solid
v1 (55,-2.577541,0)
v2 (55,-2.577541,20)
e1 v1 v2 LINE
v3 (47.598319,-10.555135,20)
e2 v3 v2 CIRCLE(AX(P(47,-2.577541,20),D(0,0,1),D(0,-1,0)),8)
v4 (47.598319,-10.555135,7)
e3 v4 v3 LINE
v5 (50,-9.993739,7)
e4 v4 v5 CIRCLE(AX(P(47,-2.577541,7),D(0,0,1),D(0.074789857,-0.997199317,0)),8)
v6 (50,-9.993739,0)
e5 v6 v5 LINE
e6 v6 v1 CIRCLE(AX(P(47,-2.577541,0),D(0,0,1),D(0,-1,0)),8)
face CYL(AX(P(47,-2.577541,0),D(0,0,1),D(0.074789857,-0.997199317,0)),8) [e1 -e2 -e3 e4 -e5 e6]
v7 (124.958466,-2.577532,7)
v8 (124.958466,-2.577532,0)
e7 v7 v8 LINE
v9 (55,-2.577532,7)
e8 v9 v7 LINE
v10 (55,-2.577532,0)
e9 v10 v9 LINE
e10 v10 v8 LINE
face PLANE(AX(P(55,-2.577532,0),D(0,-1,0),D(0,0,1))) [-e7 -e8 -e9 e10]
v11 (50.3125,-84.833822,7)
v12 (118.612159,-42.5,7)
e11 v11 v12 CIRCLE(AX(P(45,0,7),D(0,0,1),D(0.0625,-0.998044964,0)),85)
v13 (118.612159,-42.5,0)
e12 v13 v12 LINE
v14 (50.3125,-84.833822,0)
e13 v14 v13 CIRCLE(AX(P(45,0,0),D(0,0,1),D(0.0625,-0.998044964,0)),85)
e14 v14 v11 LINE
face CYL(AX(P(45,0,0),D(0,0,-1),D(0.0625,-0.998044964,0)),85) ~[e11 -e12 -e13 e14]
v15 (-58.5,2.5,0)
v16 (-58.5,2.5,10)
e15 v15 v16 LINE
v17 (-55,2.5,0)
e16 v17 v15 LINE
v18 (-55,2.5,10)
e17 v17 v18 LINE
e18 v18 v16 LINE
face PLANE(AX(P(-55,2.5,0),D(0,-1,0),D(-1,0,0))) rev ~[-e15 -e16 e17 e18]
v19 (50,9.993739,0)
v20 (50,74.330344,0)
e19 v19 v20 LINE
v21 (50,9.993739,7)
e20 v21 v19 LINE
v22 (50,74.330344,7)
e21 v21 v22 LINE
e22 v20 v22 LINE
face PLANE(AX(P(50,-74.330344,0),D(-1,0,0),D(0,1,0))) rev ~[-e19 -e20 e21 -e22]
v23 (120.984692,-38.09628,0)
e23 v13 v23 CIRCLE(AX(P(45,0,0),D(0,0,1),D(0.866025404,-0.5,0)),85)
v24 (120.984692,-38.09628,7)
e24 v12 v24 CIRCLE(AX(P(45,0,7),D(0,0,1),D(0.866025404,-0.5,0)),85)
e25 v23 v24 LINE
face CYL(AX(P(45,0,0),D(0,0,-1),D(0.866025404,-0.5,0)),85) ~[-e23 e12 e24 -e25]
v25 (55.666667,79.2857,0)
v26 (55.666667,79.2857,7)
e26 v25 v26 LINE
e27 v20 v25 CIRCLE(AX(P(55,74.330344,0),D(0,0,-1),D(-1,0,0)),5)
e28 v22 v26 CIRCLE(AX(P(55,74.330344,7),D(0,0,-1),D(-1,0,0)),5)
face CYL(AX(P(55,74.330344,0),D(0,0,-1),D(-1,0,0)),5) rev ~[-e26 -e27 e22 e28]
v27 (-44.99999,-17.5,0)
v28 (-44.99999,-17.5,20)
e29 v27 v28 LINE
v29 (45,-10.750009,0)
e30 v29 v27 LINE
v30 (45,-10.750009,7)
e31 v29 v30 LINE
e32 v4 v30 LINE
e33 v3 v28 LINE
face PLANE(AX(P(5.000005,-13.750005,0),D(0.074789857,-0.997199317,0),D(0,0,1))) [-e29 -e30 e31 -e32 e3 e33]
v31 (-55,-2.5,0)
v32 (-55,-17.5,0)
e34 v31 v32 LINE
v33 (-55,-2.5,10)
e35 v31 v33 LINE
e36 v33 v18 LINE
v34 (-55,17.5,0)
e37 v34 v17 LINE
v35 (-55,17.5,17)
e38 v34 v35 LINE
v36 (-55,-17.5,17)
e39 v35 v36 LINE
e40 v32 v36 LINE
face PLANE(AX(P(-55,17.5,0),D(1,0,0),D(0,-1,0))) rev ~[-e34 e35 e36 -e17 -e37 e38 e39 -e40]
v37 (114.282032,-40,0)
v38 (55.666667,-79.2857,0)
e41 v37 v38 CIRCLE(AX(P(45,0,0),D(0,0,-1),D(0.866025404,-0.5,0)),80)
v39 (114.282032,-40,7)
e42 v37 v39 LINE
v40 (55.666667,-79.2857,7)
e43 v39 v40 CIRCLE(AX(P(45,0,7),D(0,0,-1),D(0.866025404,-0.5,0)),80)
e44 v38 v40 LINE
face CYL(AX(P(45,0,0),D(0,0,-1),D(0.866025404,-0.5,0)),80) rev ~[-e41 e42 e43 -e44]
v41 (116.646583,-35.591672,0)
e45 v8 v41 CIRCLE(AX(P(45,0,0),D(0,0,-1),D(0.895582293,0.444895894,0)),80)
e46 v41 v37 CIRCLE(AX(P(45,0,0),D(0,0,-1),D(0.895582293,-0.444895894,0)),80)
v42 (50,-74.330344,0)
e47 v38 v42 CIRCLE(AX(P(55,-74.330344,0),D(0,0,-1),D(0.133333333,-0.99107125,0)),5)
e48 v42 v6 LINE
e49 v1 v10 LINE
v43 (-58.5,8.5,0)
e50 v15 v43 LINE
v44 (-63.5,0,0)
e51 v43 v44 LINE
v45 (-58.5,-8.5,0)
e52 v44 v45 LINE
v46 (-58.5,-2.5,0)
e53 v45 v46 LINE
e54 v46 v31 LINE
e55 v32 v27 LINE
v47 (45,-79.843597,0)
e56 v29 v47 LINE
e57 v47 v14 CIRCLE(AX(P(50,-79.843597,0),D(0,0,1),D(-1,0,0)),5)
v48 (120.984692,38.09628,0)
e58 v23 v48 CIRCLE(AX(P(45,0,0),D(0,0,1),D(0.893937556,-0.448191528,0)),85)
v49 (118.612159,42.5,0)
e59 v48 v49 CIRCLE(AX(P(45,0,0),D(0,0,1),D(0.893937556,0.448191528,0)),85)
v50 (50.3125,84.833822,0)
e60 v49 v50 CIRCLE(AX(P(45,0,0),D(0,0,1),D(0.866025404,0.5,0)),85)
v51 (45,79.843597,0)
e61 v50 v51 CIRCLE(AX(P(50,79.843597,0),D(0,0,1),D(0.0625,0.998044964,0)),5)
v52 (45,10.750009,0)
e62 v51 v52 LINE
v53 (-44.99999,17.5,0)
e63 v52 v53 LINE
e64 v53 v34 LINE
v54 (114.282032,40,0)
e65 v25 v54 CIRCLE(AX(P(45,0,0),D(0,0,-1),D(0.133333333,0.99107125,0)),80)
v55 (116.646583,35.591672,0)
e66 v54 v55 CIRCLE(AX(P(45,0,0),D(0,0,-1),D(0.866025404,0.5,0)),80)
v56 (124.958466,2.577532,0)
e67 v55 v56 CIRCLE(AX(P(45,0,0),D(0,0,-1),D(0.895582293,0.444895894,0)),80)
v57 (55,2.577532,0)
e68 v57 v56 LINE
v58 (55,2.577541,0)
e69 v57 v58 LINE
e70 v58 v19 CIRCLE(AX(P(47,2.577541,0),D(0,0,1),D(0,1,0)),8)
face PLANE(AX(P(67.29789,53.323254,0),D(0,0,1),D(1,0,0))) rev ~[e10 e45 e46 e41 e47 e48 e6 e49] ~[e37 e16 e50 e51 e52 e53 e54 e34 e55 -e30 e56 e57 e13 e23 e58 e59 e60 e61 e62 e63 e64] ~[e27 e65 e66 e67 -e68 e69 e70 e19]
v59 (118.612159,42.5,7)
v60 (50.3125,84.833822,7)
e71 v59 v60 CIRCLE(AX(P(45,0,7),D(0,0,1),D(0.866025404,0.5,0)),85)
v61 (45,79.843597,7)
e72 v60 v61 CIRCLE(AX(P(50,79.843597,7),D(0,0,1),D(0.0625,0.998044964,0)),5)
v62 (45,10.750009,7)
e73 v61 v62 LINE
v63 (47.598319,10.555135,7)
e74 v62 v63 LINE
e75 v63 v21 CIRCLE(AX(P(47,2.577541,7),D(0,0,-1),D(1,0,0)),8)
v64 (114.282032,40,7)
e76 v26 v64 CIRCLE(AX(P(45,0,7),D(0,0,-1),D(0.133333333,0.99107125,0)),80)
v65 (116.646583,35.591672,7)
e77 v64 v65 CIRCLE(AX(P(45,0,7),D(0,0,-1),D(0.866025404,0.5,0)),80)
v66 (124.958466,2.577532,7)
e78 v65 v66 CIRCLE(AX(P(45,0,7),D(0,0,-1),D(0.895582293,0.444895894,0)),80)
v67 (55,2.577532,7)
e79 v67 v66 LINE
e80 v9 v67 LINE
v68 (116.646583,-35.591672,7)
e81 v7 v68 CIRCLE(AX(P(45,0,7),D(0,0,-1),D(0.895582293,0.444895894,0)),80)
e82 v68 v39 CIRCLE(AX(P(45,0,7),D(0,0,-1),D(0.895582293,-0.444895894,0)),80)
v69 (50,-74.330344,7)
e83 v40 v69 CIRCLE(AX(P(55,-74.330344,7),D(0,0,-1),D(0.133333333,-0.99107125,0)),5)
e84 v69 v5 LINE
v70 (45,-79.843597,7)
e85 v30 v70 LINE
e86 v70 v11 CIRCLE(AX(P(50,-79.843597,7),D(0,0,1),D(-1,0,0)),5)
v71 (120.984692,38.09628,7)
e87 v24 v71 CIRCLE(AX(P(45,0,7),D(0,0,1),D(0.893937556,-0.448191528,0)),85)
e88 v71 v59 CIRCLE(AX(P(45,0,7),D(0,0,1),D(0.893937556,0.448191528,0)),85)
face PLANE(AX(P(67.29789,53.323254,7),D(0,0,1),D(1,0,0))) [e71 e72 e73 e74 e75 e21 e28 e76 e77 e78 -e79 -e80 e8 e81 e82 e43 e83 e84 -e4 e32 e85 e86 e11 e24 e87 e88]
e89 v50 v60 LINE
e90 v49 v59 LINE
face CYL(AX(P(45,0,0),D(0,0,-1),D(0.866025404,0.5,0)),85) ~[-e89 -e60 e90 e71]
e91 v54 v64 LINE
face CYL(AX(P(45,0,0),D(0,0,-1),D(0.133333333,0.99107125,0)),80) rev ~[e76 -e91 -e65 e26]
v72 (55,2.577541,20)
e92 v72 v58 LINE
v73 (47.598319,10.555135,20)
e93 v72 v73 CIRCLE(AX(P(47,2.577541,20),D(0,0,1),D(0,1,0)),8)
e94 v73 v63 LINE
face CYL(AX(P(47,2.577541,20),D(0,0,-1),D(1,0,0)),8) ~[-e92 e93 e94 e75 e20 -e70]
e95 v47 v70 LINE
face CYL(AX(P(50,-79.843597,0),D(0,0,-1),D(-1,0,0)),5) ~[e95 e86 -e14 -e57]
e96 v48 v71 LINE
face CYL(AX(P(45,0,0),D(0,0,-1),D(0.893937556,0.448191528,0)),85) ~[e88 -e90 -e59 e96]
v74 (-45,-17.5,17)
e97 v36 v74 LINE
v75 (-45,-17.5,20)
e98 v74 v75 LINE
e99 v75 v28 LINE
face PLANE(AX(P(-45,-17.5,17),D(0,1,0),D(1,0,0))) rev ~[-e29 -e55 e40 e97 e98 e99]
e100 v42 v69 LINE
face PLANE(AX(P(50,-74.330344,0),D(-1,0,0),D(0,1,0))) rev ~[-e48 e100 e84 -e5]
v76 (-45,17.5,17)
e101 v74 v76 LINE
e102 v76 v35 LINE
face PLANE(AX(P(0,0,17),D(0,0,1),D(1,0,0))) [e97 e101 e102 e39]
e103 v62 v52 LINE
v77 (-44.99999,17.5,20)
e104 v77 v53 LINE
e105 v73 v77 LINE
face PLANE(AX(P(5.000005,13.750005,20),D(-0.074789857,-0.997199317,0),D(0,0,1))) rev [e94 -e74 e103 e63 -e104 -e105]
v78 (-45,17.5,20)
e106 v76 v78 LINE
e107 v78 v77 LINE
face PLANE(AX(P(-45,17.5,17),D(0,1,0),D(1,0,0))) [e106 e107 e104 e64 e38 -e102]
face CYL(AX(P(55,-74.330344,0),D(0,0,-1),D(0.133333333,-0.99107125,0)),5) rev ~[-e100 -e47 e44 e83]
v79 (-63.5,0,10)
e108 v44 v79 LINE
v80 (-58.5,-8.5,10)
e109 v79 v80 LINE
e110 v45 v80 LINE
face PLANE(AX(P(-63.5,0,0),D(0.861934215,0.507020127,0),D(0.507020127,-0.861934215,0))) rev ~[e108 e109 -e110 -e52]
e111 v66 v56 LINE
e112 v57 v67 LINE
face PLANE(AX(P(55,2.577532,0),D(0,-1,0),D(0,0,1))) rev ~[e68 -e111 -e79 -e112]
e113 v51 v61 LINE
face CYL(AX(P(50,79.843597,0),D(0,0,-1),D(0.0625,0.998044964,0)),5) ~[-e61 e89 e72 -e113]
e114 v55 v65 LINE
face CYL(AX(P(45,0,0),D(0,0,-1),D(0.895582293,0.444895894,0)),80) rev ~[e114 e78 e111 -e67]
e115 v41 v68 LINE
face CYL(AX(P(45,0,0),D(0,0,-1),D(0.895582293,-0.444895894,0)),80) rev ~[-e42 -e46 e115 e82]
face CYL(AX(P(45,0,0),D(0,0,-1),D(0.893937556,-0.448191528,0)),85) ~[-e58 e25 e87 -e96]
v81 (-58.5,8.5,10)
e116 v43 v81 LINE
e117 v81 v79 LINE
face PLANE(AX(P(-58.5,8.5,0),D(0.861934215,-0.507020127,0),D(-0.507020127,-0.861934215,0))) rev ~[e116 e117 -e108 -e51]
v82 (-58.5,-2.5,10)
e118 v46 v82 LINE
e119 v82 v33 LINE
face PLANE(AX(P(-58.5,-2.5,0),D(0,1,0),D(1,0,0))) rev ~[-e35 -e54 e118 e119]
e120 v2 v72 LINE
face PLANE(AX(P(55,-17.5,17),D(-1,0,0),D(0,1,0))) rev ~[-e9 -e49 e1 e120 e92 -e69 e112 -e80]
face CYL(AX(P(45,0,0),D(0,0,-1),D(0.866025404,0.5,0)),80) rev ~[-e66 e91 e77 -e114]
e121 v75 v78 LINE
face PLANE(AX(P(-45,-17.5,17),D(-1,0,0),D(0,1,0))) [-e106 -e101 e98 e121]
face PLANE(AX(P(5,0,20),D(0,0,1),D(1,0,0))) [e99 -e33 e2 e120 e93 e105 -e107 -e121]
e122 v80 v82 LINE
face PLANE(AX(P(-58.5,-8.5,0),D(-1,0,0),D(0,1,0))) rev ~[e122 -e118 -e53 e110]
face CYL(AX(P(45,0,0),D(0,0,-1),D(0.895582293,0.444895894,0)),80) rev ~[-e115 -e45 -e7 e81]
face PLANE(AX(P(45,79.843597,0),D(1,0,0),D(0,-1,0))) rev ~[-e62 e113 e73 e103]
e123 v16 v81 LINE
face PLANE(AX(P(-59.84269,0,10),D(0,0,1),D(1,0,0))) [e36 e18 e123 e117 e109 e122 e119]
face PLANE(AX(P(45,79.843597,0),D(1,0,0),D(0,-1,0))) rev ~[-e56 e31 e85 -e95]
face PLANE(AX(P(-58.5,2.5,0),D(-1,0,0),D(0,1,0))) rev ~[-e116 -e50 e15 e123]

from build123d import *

# Parameters (mm, degrees)
F1_DEPTH = 10
F2_DEPTH = 17
F3_W     = 100
F3_H     = 35
F4_DEPTH = 3
F5_SIZE2 = 99.99999
F5_SIZE  = 7.49999
F6_R     = 8
F8_DEPTH = 7
F9_W     = 5.1550631039
F9_H     = 7


# Not quite as in the source:
# - a fillet or chamfer is up to 0.001 mm smaller than in the source, because OpenCascade refuses the exact size


with BuildPart() as f1:
    # F0 (on Top) → F1 (new body)
    with BuildSketch(Plane.XY):
        Polygon((-58.5, -8.5), (-58.5, -2.5), (-58.5, 0), (-58.5, 2.5), (-58.5, 8.5), (-63.5, 0), align=None)
        Polygon((-58.5, -2.5), (-55, -2.5), (-55, 2.5), (-58.5, 2.5), (-58.5, 0), align=None)
    extrude(amount=F1_DEPTH)

    # F0 (on Top) → F2 (join)
    with BuildSketch(Plane.XY):
        Polygon((-55, -17.5), (55, -17.5), (55, 17.5), (-55, 17.5), (-55, 2.5), (-55, -2.5), align=None)
    extrude(amount=F2_DEPTH)

    # F3 (on face) → F4 (join)
    with BuildSketch(Plane.XY.offset(17)):
        with Locations((5, 0)):
            Rectangle(F3_W, F3_H)
    extrude(amount=F4_DEPTH)

    # F5 (size 7.5 and 100 in the source; OpenCascade refuses exactly that, so slightly less here)
    f5_edges = [f1.edges().sort_by_distance(p)[0] for p in [
        (55, -17.5, 10),
        (55, 17.5, 10),
    ]]
    f5_side = f1.faces().sort_by_distance((55, 0, 10))[0]
    chamfer(f5_edges, length=F5_SIZE, length2=F5_SIZE2, reference=f5_side)

    # F6
    f6_edges = [f1.edges().sort_by_distance(p)[0] for p in [
        (55, -10.00001, 10),
        (55, 10.00001, 10),
    ]]
    fillet(f6_edges, radius=F6_R)

    # F7 (on face) → F8 (join)
    with BuildSketch(Plane.XY):
        with BuildLine():
            ThreePointArc((118.6121593217, 42.5), (89.7807277981, 72.2473973087), (50.3125, 84.8338219329))
            ThreePointArc((50.3125, 84.8338219329), (46.5767340156, 83.4879420476), (45, 79.8435971134))
            Line((45, 79.8435971134), (45, 0))
            Line((45, 0), (50, 2.8867513459))
            Line((50, 2.8867513459), (50, 74.3303437366))
            ThreePointArc((50, 74.3303437366), (51.708597057, 78.0942070001), (55.6666666667, 79.2856999857))
            ThreePointArc((55.6666666667, 79.2856999857), (89.5397594579, 66.4545696505), (114.2820323028, 40))
            Line((114.2820323028, 40), (118.6121593217, 42.5))
        make_face()
        with BuildLine():
            ThreePointArc((120.9846922835, 38.0962798523), (119.8308271392, 40.3155963576), (118.6121593217, 42.5))
            Line((118.6121593217, 42.5), (114.2820323028, 40))
            ThreePointArc((114.2820323028, 40), (115.4987732023, 37.8143223789), (116.6465834297, 35.5916715378))
            Line((116.6465834297, 35.5916715378), (120.9846922835, 38.0962798523))
        make_face()
        with BuildLine():
            ThreePointArc((120.9846922835, -38.0962798523), (130, 0), (120.9846922835, 38.0962798523))
            Line((120.9846922835, 38.0962798523), (116.6465834297, 35.5916715378))
            ThreePointArc((116.6465834297, 35.5916715378), (125, 0), (116.6465834297, -35.5916715378))
            Line((116.6465834297, -35.5916715378), (120.9846922835, -38.0962798523))
        make_face()
        with BuildLine():
            Line((50, -2.8867513459), (45, 0))
            Line((45, 0), (45, -79.8435971134))
            ThreePointArc((45, -79.8435971134), (46.5767340156, -83.4879420476), (50.3125, -84.8338219329))
            ThreePointArc((50.3125, -84.8338219329), (89.7807277981, -72.2473973087), (118.6121593217, -42.5))
            Line((118.6121593217, -42.5), (114.2820323028, -40))
            ThreePointArc((114.2820323028, -40), (89.5397594579, -66.4545696505), (55.6666666667, -79.2856999857))
            ThreePointArc((55.6666666667, -79.2856999857), (51.708597057, -78.0942070001), (50, -74.3303437366))
            Line((50, -74.3303437366), (50, -2.8867513459))
        make_face()
        Polygon((50, 2.8867513459), (45, 0), (50, -2.8867513459), align=None)
        with BuildLine():
            ThreePointArc((118.6121593217, -42.5), (119.8308271392, -40.3155963576), (120.9846922835, -38.0962798523))
            Line((120.9846922835, -38.0962798523), (116.6465834297, -35.5916715378))
            ThreePointArc((116.6465834297, -35.5916715378), (115.4987732023, -37.8143223789), (114.2820323028, -40))
            Line((114.2820323028, -40), (118.6121593217, -42.5))
        make_face()
    extrude(amount=F8_DEPTH)

    # F9 (on face) → F10 (join, up to the next surface of F1)
    with BuildSketch(Plane.YZ.offset(55)):
        with Locations((0, 3.5)):
            Rectangle(F9_W, F9_H)
    extrude(until=Until.NEXT)


solid = f1.part
